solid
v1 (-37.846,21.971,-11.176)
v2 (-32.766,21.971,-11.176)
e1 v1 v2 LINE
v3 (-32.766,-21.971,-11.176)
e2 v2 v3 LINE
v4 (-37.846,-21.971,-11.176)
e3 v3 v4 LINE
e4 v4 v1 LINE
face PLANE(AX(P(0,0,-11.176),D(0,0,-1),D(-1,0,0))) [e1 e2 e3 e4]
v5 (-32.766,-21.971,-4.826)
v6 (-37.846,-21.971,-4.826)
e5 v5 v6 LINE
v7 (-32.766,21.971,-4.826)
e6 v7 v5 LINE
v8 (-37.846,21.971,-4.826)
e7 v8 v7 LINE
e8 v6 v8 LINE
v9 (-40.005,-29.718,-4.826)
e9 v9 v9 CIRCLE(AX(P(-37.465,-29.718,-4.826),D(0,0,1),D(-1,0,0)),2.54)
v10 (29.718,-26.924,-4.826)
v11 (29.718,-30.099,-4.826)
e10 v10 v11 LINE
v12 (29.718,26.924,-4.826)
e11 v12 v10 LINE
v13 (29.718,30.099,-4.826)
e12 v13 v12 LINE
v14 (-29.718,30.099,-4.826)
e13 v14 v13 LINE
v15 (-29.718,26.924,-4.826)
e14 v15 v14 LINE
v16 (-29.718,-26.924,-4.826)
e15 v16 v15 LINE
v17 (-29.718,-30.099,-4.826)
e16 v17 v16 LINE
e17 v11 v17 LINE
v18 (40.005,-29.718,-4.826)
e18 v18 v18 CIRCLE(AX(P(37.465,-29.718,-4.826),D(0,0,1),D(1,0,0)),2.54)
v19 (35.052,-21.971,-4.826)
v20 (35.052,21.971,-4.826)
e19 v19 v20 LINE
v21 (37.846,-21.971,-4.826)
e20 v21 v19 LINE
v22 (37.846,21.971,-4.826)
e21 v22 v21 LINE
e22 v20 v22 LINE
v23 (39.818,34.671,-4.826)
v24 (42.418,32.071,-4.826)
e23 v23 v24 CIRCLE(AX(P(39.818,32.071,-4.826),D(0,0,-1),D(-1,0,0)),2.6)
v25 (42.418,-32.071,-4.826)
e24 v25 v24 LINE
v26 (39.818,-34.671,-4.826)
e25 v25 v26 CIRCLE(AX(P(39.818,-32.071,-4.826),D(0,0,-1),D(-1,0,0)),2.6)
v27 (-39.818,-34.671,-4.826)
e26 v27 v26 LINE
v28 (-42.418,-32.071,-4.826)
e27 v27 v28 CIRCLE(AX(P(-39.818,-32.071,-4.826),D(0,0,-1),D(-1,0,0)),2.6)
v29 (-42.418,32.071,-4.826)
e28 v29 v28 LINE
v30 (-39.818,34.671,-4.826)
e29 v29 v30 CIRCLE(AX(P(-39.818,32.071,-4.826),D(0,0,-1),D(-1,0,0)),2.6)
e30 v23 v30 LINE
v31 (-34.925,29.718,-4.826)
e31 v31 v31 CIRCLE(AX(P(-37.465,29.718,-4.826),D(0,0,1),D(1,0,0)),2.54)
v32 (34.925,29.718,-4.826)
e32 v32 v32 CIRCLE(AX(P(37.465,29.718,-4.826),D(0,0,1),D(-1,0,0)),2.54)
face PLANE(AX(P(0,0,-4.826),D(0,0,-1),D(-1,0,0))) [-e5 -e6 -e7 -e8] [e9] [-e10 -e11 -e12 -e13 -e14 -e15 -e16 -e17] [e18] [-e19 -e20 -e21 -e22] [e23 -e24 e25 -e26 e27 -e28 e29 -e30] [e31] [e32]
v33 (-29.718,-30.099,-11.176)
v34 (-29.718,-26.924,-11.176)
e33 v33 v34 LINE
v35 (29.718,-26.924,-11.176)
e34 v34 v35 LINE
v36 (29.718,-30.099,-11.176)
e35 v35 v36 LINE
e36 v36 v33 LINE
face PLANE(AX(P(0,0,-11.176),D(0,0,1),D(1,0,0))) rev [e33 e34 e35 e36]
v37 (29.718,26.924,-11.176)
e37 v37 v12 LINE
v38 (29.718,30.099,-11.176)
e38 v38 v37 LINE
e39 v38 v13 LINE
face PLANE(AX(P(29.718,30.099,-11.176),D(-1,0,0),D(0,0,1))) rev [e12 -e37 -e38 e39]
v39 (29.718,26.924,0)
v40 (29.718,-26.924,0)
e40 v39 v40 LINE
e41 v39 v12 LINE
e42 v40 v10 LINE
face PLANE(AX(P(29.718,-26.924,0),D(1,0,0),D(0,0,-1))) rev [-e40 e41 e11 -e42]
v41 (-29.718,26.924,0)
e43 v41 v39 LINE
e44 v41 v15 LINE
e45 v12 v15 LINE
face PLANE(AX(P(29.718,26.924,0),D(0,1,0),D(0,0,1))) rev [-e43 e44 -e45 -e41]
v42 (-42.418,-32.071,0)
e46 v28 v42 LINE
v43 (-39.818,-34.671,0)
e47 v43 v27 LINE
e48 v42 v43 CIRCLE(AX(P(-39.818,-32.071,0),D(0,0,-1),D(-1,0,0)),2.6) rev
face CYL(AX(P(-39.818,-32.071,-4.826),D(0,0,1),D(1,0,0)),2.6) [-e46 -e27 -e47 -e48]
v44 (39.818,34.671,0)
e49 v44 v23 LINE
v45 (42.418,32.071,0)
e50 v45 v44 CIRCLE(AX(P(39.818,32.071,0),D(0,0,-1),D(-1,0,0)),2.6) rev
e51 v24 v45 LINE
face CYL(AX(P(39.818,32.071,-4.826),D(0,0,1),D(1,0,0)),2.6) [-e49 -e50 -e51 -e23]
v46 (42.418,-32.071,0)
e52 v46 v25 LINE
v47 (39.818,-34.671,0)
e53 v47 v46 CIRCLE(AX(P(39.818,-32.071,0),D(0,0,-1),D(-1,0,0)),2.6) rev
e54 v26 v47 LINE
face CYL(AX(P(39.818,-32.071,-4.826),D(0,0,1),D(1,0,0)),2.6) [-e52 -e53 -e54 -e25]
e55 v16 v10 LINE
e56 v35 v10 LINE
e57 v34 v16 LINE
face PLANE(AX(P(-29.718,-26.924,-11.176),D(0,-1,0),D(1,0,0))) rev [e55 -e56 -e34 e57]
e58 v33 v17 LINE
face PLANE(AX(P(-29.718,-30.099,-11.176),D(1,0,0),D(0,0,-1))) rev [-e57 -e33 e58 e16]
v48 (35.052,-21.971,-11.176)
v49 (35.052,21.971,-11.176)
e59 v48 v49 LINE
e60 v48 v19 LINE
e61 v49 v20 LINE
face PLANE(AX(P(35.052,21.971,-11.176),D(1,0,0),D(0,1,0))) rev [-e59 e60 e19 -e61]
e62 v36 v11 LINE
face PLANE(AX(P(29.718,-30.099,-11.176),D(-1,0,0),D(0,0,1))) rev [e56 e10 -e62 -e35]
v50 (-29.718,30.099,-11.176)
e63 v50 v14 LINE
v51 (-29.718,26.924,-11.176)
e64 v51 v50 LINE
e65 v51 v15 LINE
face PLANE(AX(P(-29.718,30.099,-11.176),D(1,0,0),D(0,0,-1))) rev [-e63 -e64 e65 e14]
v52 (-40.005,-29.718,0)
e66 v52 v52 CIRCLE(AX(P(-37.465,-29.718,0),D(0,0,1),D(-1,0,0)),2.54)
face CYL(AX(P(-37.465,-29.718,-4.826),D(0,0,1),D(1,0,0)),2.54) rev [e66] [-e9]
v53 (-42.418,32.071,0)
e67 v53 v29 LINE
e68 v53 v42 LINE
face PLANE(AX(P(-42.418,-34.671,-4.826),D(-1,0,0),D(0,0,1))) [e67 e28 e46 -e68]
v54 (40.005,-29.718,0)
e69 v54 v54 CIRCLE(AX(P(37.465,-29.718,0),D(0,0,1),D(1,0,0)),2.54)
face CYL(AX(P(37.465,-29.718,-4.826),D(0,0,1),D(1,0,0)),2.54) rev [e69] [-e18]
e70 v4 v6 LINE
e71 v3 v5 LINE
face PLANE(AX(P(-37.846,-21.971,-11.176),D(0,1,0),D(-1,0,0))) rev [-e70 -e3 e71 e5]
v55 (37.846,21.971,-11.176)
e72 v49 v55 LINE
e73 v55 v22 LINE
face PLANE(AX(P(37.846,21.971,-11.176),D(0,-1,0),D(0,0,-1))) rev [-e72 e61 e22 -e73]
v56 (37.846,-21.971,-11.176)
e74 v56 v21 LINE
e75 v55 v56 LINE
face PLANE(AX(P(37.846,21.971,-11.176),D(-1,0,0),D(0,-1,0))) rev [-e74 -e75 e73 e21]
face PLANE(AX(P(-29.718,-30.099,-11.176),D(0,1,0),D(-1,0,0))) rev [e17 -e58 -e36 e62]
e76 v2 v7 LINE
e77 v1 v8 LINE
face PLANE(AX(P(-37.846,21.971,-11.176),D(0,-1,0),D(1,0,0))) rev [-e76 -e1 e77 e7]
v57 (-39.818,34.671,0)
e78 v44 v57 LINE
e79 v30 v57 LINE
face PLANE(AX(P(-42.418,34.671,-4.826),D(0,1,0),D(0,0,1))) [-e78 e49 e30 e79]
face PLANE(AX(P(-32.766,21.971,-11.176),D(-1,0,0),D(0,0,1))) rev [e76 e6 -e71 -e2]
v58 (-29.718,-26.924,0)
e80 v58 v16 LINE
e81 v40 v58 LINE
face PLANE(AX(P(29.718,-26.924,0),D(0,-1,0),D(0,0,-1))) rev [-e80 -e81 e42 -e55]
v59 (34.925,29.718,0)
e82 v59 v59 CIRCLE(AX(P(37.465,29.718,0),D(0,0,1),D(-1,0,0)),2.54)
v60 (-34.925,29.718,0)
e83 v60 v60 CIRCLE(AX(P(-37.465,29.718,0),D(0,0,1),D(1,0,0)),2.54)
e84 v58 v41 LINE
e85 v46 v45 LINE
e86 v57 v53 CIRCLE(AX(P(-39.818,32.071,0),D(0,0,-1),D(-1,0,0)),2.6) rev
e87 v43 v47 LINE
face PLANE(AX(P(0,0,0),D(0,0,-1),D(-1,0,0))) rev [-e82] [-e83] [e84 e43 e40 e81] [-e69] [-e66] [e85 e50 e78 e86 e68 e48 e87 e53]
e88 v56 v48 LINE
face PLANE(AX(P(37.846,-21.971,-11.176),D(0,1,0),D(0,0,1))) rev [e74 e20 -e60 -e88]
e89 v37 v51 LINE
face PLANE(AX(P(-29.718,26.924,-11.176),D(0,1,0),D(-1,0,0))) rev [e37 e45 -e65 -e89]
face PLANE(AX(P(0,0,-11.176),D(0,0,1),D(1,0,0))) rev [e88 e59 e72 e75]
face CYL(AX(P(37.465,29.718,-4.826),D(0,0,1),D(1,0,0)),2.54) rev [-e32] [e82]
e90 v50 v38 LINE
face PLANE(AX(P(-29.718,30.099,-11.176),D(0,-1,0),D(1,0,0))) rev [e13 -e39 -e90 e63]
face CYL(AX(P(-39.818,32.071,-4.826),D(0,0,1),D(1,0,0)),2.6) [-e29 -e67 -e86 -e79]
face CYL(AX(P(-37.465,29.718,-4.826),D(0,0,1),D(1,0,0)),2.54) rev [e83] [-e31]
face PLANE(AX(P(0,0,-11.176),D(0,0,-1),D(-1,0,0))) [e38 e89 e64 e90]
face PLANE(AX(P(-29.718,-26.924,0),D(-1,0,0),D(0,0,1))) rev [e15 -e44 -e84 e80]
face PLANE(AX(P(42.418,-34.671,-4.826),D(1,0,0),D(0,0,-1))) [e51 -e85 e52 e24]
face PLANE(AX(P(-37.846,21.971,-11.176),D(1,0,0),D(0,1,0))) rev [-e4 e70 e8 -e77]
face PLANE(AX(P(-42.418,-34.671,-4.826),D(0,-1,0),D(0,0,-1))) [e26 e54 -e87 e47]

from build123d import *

# Parameters (mm, degrees)
SKETCH1_W           = 84.836
SKETCH1_H           = 69.342
BASE_FLANGE1_DEPTH  = 4.826
SKETCH6_R           = 2.54
CUT_EXTRUDE1_DEPTH  = 10
FILLET1_R           = 2.6
SKETCH11_W          = 59.436
SKETCH11_H          = 3.175
SKETCH11_W_2        = 5.08
SKETCH11_H_2        = 43.942
SKETCH11_W_3        = 2.794
BOSS_EXTRUDE1_DEPTH = 6.35
SKETCH12_W          = 59.436
SKETCH12_H          = 53.848
CUT_EXTRUDE5_DEPTH  = 56.151495583


# Sheet-metal steps are written as plain solids
with BuildPart() as part:
    # Sketch1 → Base-Flange1 (new body)
    with BuildSketch(Plane.XY):
        Rectangle(SKETCH1_W, SKETCH1_H)
    extrude(amount=-BASE_FLANGE1_DEPTH)

    # Sketch6 → Cut-Extrude1 (cut)
    with BuildSketch(Plane.XY):
        with Locations((-37.465, 29.718)):
            Circle(SKETCH6_R)
        with Locations(Location((-37.465, -29.718, 0), (0, 0, 180))):
            Circle(SKETCH6_R)
        with Locations((37.465, -29.718)):
            Circle(SKETCH6_R)
        with Locations(Location((37.465, 29.718, 0), (0, 0, 180))):
            Circle(SKETCH6_R)
    extrude(amount=-CUT_EXTRUDE1_DEPTH, mode=Mode.SUBTRACT)

    # Fillet1
    fillet1_edges = [part.edges().sort_by_distance(p)[0] for p in [
        (-42.418, 34.671, -2.413),
        (42.418, 34.671, -2.413),
        (42.418, -34.671, -2.413),
        (-42.418, -34.671, -2.413),
    ]]
    fillet(fillet1_edges, radius=FILLET1_R)

    # Sketch11 → Boss-Extrude1 (add)
    with BuildSketch(Plane(origin=(0, 0, -4.826), x_dir=(-1, 0, 0), z_dir=(0, 0, -1))):
        with Locations((0, 28.5115)):
            Rectangle(SKETCH11_W, SKETCH11_H)
        with Locations((35.306, 0)):
            Rectangle(SKETCH11_W_2, SKETCH11_H_2)
        with Locations((0, -28.5115)):
            Rectangle(SKETCH11_W, SKETCH11_H)
        with Locations((-36.449, 0)):
            Rectangle(SKETCH11_W_3, SKETCH11_H_2)
    extrude(amount=BOSS_EXTRUDE1_DEPTH)

    # Sketch12 → Cut-Extrude5 (cut, through all)
    with BuildSketch(Plane(origin=(0, 0, -4.826), x_dir=(-1, 0, 0), z_dir=(0, 0, -1))):
        Rectangle(SKETCH12_W, SKETCH12_H)
    extrude(amount=-CUT_EXTRUDE5_DEPTH, mode=Mode.SUBTRACT)


solid = part.part
